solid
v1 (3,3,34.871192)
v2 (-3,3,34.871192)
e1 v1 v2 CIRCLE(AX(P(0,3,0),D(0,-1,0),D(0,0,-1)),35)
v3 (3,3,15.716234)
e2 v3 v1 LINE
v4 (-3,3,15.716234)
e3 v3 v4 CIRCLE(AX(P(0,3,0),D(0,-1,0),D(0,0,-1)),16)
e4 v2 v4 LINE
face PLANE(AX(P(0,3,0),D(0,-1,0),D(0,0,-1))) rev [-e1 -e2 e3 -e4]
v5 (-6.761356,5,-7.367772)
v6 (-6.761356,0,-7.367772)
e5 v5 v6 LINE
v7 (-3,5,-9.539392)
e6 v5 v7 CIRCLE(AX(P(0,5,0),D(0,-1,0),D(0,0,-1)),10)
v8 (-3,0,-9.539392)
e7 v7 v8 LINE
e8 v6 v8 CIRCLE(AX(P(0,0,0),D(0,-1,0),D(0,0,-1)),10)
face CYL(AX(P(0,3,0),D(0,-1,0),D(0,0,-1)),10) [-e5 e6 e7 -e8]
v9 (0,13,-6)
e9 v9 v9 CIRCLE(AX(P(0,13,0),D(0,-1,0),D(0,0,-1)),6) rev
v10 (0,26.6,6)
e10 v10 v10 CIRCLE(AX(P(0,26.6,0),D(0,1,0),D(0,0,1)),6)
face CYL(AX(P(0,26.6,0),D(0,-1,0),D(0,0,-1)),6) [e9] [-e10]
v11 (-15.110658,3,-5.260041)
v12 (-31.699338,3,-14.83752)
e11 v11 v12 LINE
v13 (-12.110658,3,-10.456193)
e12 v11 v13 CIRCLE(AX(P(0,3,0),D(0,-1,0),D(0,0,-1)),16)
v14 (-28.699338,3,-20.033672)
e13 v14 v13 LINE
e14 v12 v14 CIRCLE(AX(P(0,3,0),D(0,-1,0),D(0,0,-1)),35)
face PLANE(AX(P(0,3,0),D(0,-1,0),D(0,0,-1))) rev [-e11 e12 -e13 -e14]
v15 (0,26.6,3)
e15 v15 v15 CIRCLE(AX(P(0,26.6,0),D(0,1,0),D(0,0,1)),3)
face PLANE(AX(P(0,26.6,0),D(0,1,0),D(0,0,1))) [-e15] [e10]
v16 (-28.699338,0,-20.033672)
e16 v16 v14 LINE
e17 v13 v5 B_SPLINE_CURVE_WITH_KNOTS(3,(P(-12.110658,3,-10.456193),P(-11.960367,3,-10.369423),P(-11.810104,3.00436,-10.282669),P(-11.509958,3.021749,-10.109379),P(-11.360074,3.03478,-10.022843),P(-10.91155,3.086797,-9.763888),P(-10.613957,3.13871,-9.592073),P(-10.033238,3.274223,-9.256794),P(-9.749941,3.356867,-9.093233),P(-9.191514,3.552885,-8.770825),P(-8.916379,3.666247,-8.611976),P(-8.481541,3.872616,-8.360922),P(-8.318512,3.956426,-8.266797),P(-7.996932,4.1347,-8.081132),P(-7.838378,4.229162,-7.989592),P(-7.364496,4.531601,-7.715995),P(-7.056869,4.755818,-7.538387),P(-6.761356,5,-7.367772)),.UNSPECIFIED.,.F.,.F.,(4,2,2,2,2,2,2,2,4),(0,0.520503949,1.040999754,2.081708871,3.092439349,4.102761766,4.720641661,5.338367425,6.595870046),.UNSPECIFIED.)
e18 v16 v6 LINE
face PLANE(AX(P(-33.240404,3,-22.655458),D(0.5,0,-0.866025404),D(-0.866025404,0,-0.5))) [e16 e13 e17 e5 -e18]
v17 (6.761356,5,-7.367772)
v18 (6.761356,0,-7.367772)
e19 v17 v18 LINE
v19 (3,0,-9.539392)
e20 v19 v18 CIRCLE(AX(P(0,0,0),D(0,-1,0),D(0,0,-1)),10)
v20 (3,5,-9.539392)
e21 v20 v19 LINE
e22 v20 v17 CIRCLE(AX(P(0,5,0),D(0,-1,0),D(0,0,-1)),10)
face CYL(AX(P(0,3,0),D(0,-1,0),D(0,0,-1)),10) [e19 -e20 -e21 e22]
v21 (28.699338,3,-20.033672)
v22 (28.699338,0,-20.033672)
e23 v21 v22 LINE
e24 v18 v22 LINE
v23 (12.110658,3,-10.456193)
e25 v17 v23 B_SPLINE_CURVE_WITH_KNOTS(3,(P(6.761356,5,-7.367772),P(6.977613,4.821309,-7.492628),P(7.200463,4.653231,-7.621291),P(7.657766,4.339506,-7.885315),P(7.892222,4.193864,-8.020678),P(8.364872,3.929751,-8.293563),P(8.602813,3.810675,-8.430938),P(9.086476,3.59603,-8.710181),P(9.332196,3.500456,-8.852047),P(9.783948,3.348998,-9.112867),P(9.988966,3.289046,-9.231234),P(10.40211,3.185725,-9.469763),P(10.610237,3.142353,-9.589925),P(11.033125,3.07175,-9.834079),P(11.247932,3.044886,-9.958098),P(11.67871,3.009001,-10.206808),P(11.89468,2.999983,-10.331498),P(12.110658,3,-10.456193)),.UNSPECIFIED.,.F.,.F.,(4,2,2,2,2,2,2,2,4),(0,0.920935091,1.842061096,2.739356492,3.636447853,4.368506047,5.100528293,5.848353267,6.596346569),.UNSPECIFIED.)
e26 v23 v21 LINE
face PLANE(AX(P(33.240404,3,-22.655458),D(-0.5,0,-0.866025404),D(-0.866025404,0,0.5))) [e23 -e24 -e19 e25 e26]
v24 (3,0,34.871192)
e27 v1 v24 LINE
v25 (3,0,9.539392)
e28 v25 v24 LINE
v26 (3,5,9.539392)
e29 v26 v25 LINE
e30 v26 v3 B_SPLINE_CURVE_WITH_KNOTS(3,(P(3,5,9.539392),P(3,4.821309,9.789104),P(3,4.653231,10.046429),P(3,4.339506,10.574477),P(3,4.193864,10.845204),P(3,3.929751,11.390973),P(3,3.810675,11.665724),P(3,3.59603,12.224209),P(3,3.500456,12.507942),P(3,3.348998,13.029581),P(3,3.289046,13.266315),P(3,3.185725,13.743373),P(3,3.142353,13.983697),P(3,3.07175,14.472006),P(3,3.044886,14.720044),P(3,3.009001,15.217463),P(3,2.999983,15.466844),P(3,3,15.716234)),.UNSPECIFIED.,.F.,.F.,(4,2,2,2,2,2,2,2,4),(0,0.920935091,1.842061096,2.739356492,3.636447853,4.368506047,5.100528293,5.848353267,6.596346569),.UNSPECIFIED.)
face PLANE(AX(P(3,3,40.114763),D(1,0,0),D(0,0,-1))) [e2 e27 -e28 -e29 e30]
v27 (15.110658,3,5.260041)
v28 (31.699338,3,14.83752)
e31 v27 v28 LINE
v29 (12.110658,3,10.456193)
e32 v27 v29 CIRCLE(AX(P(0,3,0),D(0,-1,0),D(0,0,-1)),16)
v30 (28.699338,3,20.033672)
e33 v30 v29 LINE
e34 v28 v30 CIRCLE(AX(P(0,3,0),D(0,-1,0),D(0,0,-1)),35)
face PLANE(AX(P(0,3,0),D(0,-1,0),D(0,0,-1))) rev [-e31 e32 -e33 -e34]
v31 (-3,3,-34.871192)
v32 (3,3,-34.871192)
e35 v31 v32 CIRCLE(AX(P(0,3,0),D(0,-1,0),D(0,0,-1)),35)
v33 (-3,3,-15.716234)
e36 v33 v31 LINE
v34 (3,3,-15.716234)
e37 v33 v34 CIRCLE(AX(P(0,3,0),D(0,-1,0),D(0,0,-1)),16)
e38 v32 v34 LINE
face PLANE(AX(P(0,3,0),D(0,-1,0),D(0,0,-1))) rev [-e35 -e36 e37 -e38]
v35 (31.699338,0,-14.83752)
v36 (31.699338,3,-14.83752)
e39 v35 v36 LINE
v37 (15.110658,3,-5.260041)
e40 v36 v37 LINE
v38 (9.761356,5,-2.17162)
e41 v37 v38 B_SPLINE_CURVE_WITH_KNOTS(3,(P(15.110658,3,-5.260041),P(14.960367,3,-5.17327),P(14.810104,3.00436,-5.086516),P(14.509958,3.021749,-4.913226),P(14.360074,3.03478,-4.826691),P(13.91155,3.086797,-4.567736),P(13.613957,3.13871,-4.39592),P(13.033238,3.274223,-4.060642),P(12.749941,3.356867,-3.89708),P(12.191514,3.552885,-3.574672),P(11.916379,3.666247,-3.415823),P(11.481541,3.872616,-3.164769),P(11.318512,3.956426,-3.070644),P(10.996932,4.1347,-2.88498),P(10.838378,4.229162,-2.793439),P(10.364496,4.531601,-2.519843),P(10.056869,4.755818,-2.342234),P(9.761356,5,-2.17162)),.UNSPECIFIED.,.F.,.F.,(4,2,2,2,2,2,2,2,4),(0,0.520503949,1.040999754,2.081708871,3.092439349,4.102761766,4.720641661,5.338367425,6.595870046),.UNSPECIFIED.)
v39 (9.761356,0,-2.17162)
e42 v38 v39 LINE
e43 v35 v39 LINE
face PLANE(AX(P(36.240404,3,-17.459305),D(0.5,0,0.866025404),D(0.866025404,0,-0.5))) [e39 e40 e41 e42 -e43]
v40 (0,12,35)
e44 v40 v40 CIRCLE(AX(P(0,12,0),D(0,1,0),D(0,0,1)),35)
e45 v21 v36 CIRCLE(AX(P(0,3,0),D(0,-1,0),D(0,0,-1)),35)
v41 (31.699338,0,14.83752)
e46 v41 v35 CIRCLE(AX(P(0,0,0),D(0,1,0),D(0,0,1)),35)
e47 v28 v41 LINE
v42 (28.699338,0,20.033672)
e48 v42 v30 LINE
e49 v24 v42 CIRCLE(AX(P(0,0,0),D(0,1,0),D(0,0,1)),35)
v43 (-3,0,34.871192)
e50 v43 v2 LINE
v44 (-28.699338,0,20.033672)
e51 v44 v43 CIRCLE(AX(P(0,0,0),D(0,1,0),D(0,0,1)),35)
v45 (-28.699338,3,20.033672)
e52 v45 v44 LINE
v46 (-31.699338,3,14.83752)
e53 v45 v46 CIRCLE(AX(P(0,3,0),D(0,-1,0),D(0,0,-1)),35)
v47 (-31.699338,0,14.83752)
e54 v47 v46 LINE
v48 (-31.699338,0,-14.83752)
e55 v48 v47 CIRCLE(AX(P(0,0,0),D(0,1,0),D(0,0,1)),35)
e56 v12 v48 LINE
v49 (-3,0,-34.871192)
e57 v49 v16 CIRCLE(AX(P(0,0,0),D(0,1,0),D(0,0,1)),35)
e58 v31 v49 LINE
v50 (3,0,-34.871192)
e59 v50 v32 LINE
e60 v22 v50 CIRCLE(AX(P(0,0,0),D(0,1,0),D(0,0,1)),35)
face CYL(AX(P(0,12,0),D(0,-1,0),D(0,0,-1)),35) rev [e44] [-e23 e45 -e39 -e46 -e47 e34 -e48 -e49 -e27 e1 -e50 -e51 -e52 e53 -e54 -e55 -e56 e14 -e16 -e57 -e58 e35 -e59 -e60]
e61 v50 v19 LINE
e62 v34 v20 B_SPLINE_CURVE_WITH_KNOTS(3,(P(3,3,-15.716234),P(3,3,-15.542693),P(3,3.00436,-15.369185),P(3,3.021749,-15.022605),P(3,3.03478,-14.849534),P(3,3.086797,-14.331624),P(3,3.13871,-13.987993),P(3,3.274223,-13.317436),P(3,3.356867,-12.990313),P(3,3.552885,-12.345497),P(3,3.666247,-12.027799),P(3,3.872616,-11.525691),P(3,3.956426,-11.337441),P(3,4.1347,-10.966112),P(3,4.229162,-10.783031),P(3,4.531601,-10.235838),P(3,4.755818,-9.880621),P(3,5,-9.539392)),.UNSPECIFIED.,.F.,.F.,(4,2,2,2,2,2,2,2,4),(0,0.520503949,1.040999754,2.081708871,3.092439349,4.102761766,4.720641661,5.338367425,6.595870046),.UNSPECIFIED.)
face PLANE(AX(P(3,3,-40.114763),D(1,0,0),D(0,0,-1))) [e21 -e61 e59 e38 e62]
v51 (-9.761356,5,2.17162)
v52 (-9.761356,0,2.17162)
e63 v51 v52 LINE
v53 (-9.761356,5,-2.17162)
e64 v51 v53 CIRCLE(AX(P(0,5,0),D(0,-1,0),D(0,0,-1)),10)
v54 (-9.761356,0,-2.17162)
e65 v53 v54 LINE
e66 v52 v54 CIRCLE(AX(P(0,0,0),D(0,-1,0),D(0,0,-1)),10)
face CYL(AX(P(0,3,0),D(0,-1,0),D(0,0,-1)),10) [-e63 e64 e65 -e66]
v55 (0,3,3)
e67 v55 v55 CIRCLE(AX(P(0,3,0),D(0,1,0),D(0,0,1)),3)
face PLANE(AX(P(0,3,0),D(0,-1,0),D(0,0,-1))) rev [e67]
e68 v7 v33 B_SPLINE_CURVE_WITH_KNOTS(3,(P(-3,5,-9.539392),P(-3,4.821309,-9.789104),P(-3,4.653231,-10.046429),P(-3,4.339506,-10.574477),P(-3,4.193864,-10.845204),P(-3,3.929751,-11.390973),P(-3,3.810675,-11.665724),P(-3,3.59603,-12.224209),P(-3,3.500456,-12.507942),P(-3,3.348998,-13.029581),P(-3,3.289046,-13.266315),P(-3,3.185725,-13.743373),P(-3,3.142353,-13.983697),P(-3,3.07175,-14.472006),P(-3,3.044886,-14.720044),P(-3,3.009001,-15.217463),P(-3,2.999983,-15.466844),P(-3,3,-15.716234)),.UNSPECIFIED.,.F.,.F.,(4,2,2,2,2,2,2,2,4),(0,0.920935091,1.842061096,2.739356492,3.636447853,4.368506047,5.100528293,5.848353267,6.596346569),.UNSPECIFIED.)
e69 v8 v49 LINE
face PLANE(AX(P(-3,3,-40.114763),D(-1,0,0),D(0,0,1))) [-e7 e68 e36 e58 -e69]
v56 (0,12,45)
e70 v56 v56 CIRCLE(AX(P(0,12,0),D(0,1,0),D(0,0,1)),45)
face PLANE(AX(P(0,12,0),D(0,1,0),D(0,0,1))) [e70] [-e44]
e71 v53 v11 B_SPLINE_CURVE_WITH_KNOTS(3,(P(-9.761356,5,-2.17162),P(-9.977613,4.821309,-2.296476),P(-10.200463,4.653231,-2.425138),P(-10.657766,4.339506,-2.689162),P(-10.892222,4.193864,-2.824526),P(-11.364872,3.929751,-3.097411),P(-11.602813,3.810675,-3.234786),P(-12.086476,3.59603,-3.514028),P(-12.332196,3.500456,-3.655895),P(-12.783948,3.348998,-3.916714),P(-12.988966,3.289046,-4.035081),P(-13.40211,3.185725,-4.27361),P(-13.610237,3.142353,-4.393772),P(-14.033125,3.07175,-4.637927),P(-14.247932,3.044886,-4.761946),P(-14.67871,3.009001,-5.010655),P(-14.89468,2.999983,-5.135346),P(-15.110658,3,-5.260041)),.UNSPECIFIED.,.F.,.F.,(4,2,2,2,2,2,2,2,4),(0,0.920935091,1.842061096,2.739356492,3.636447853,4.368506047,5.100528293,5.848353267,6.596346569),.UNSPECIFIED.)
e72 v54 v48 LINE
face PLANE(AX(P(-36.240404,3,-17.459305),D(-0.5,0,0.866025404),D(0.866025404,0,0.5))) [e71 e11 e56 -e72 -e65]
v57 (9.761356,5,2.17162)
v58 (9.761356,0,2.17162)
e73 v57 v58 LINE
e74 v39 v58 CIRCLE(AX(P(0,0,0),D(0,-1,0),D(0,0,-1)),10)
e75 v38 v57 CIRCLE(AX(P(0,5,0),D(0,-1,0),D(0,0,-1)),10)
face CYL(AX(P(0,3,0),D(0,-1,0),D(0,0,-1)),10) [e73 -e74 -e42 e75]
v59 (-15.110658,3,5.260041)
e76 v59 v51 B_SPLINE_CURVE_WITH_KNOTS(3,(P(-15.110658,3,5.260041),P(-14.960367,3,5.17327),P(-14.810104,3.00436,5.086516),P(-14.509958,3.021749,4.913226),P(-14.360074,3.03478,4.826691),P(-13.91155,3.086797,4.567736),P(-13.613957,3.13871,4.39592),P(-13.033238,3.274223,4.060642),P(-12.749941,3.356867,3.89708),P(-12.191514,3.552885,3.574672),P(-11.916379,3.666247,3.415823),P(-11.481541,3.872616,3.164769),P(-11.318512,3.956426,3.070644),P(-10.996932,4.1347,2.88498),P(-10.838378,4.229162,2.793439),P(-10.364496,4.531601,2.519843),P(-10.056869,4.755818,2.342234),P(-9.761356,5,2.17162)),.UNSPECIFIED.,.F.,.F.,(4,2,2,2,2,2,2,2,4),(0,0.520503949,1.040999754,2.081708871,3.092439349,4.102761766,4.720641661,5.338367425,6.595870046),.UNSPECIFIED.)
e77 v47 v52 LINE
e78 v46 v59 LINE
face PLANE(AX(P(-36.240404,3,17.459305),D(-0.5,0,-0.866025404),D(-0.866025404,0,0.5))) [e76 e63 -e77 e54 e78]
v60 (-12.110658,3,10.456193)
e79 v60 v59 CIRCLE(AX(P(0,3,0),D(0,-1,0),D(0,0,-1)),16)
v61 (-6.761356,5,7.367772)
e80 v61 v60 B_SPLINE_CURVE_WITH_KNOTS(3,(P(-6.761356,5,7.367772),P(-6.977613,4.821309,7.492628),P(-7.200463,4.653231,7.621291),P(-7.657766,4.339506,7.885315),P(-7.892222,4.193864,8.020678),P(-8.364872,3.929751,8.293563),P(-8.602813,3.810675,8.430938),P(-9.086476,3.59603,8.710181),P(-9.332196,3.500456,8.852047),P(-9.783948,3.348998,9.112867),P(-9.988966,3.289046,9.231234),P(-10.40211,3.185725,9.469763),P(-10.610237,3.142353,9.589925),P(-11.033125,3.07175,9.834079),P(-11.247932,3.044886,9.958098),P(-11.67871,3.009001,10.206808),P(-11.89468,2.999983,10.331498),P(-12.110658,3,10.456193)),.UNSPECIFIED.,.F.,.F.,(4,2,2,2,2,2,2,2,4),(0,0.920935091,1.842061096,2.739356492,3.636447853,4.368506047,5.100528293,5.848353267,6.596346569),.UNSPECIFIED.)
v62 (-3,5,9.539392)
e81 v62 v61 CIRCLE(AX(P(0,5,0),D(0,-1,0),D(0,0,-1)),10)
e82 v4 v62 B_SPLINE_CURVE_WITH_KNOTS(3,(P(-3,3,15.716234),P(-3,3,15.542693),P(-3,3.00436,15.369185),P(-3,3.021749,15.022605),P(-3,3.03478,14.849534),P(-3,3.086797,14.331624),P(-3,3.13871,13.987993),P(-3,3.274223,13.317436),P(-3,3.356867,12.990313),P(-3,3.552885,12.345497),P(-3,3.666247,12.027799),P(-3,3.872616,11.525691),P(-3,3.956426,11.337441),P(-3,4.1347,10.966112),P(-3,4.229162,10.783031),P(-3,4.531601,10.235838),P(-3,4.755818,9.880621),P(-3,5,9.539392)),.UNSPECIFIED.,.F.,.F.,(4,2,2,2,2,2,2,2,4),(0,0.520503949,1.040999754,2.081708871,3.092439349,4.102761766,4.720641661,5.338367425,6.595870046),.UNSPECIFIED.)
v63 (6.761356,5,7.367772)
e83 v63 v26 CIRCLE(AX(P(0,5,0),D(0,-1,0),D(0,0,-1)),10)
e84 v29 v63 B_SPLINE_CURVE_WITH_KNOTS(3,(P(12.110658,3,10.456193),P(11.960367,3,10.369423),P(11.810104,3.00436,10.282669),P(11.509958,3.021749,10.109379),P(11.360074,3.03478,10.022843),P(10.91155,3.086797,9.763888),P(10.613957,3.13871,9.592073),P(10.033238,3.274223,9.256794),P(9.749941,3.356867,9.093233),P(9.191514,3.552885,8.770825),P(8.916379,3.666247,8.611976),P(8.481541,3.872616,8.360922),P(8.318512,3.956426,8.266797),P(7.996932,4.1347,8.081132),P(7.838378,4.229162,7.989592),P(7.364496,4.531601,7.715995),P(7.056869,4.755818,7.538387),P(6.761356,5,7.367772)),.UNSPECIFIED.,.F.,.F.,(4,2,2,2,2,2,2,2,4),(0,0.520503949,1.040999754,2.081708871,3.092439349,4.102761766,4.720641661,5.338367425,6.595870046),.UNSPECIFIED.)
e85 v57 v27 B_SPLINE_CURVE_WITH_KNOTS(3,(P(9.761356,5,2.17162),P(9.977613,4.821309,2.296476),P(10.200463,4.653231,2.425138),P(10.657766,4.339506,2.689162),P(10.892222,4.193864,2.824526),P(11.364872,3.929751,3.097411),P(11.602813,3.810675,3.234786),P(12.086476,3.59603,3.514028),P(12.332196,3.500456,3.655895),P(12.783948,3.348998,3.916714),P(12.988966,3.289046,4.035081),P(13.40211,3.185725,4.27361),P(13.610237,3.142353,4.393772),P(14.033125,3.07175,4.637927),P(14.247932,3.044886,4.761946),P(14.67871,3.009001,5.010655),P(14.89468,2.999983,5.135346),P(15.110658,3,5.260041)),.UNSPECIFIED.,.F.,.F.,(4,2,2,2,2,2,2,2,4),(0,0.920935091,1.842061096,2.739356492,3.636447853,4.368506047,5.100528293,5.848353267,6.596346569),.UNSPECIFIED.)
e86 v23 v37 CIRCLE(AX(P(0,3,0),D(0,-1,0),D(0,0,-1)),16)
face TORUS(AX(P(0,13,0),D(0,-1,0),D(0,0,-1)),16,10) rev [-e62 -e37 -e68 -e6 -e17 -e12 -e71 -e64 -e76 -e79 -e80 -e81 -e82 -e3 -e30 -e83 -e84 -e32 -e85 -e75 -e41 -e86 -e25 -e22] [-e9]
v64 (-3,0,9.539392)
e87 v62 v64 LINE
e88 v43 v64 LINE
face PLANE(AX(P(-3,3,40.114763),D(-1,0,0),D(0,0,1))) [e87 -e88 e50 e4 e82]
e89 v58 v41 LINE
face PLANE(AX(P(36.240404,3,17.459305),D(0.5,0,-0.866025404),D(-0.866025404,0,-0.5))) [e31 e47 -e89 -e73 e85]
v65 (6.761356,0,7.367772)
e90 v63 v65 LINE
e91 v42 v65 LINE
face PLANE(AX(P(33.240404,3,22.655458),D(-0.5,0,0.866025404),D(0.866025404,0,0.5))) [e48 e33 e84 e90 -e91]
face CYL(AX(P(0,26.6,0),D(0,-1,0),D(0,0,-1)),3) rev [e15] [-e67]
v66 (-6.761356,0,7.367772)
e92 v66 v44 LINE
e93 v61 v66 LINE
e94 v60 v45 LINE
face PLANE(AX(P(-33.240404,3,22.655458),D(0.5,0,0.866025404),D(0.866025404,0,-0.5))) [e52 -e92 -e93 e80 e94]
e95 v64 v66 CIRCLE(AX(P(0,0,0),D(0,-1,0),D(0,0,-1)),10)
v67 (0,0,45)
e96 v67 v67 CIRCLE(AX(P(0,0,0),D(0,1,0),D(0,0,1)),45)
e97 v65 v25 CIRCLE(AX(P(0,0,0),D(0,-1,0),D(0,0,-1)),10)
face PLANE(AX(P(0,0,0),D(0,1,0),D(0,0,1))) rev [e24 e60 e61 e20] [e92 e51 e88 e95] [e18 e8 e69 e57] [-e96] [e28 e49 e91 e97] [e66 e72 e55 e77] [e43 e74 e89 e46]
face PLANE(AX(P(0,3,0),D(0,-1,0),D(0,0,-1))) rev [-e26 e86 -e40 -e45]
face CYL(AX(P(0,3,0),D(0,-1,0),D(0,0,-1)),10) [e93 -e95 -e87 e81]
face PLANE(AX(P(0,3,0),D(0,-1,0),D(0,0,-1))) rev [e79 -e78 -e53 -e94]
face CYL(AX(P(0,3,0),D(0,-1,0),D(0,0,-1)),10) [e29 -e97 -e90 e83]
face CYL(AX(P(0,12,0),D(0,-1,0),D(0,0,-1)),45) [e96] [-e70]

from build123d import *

# Parameters (mm, degrees)
SKETCH2_R           = 45
SKETCH2_R_2         = 35
BOSS_EXTRUDE1_DEPTH = 12
BOSS_EXTRUDE2_DEPTH = 3
CIRPATTERN1_COUNT   = 6
SKETCH4_R           = 6
SKETCH4_R_2         = 3
BOSS_EXTRUDE3_DEPTH = 23.6
FILLET1_R           = 10


with BuildPart() as part:
    # Sketch2 → Boss-Extrude1 (new body)
    with BuildSketch(Plane(origin=(0, 0, 0), x_dir=(1, 0, 0), z_dir=(0, 1, 0))):
        with Locations(Location((0, 0, 0), (0, 0, 270))):
            Circle(SKETCH2_R)
        with Locations(Location((0, 0, 0), (0, 0, 270))):
            Circle(SKETCH2_R_2, mode=Mode.SUBTRACT)
    extrude(amount=BOSS_EXTRUDE1_DEPTH)

    # Sketch3 → Boss-Extrude2 (add)
    with BuildSketch(Plane.XZ):
        with BuildLine():
            Line((-3, 40.114762923), (3, 40.114762923))
            Line((3, 40.114762923), (3, 9.539392014))
            ThreePointArc((3, 9.539392014), (0, -10), (-3, 9.539392014))
            Line((-3, 9.539392014), (-3, 40.114762923))
        make_face()
    boss_extrude2 = extrude(amount=-BOSS_EXTRUDE2_DEPTH)

    # CirPattern1: Boss-Extrude2 ×6 about axis
    cirpattern1_axis = Axis((0, 0, 0), (0, 1, 0))
    for i in range(1, CIRPATTERN1_COUNT):
        add(boss_extrude2.rotate(cirpattern1_axis, i * 360 / CIRPATTERN1_COUNT))

    # Sketch4 → Boss-Extrude3 (add)
    with BuildSketch(Plane(origin=(0, 3, 0), x_dir=(1, 0, 0), z_dir=(0, 1, 0))):
        with Locations(Location((0, 0, 0), (0, 0, 90))):
            Circle(SKETCH4_R)
        with Locations(Location((0, 0, 0), (0, 0, 270))):
            Circle(SKETCH4_R_2, mode=Mode.SUBTRACT)
    extrude(amount=BOSS_EXTRUDE3_DEPTH)

    # Fillet1
    # the kernel refuses this fillet: 10 mm, written as the material it adds along each edge
    with BuildSketch(Plane(origin=(0, 3, 0), x_dir=(0, 0, -1), z_dir=(1, 0, 0))) as fillet1_piece_1_section:
        with BuildLine():
            CenterArc((6 + FILLET1_R, FILLET1_R), FILLET1_R, 180, 90)
            Line((6, FILLET1_R), (6, 0))
            Line((6, 0), (6 + FILLET1_R, 0))
        make_face()
    fillet1_piece_1 = revolve(axis=Axis((0, 3, 0), (0, 1, 0)), mode=Mode.PRIVATE)
    fillet1_piece_1 = split(fillet1_piece_1, bisect_by=Plane(origin=(3, 3.588688927, -11.330954683), z_dir=(-1, 0, 0)), keep=Keep.TOP, mode=Mode.PRIVATE)
    fillet1_piece_1 = split(fillet1_piece_1, bisect_by=Plane(origin=(-3, 3.588688927, -11.330954683), z_dir=(1, 0, 0)), keep=Keep.TOP, mode=Mode.PRIVATE)
    add(fillet1_piece_1)
    with BuildSketch(Plane(origin=(0, 3, 0), x_dir=(0, 0, -1), z_dir=(1, 0, 0))) as fillet1_piece_2_section:
        with BuildLine():
            CenterArc((6 + FILLET1_R, FILLET1_R), FILLET1_R, 180, 90)
            Line((6, FILLET1_R), (6, 0))
            Line((6, 0), (6 + FILLET1_R, 0))
        make_face()
    fillet1_piece_2 = revolve(axis=Axis((0, 3, 0), (0, 1, 0)), mode=Mode.PRIVATE)
    fillet1_piece_2 = fillet1_piece_2 & Plane(origin=(0, 4.321014417, 0), x_dir=(0.2999999999999998, 0, 0.9539392014169458), z_dir=(0, -1, 0)) * Cylinder(10, 64, mode=Mode.PRIVATE)
    add(fillet1_piece_2)
    with BuildSketch(Plane(origin=(0, 3, 0), x_dir=(0, 0, -1), z_dir=(1, 0, 0))) as fillet1_piece_3_section:
        with BuildLine():
            CenterArc((6 + FILLET1_R, FILLET1_R), FILLET1_R, 180, 90)
            Line((6, FILLET1_R), (6, 0))
            Line((6, 0), (6 + FILLET1_R, 0))
        make_face()
    fillet1_piece_3 = revolve(axis=Axis((0, 3, 0), (0, 1, 0)), mode=Mode.PRIVATE)
    fillet1_piece_3 = split(fillet1_piece_3, bisect_by=Plane(origin=(-11.312894604, 3.588688928, -3.06740113), z_dir=(0.5000000000000002, 0, -0.8660254037844386)), keep=Keep.TOP, mode=Mode.PRIVATE)
    fillet1_piece_3 = split(fillet1_piece_3, bisect_by=Plane(origin=(-8.312894604, 3.588688928, -8.263553553), z_dir=(-0.5000000000000001, 0, 0.8660254037844387)), keep=Keep.TOP, mode=Mode.PRIVATE)
    add(fillet1_piece_3)
    with BuildSketch(Plane(origin=(0, 3, 0), x_dir=(0, 0, -1), z_dir=(1, 0, 0))) as fillet1_piece_4_section:
        with BuildLine():
            CenterArc((6 + FILLET1_R, FILLET1_R), FILLET1_R, 180, 90)
            Line((6, FILLET1_R), (6, 0))
            Line((6, 0), (6 + FILLET1_R, 0))
        make_face()
    fillet1_piece_4 = revolve(axis=Axis((0, 3, 0), (0, 1, 0)), mode=Mode.PRIVATE)
    fillet1_piece_4 = split(fillet1_piece_4, bisect_by=Plane(origin=(11.312894604, 3.588688928, -3.06740113), z_dir=(-0.4999999999999998, 0, -0.8660254037844388)), keep=Keep.TOP, mode=Mode.PRIVATE)
    fillet1_piece_4 = split(fillet1_piece_4, bisect_by=Plane(origin=(8.312894604, 3.588688928, -8.263553553), z_dir=(0.49999999999999994, 0, 0.8660254037844389)), keep=Keep.TOP, mode=Mode.PRIVATE)
    add(fillet1_piece_4)


solid = part.part
